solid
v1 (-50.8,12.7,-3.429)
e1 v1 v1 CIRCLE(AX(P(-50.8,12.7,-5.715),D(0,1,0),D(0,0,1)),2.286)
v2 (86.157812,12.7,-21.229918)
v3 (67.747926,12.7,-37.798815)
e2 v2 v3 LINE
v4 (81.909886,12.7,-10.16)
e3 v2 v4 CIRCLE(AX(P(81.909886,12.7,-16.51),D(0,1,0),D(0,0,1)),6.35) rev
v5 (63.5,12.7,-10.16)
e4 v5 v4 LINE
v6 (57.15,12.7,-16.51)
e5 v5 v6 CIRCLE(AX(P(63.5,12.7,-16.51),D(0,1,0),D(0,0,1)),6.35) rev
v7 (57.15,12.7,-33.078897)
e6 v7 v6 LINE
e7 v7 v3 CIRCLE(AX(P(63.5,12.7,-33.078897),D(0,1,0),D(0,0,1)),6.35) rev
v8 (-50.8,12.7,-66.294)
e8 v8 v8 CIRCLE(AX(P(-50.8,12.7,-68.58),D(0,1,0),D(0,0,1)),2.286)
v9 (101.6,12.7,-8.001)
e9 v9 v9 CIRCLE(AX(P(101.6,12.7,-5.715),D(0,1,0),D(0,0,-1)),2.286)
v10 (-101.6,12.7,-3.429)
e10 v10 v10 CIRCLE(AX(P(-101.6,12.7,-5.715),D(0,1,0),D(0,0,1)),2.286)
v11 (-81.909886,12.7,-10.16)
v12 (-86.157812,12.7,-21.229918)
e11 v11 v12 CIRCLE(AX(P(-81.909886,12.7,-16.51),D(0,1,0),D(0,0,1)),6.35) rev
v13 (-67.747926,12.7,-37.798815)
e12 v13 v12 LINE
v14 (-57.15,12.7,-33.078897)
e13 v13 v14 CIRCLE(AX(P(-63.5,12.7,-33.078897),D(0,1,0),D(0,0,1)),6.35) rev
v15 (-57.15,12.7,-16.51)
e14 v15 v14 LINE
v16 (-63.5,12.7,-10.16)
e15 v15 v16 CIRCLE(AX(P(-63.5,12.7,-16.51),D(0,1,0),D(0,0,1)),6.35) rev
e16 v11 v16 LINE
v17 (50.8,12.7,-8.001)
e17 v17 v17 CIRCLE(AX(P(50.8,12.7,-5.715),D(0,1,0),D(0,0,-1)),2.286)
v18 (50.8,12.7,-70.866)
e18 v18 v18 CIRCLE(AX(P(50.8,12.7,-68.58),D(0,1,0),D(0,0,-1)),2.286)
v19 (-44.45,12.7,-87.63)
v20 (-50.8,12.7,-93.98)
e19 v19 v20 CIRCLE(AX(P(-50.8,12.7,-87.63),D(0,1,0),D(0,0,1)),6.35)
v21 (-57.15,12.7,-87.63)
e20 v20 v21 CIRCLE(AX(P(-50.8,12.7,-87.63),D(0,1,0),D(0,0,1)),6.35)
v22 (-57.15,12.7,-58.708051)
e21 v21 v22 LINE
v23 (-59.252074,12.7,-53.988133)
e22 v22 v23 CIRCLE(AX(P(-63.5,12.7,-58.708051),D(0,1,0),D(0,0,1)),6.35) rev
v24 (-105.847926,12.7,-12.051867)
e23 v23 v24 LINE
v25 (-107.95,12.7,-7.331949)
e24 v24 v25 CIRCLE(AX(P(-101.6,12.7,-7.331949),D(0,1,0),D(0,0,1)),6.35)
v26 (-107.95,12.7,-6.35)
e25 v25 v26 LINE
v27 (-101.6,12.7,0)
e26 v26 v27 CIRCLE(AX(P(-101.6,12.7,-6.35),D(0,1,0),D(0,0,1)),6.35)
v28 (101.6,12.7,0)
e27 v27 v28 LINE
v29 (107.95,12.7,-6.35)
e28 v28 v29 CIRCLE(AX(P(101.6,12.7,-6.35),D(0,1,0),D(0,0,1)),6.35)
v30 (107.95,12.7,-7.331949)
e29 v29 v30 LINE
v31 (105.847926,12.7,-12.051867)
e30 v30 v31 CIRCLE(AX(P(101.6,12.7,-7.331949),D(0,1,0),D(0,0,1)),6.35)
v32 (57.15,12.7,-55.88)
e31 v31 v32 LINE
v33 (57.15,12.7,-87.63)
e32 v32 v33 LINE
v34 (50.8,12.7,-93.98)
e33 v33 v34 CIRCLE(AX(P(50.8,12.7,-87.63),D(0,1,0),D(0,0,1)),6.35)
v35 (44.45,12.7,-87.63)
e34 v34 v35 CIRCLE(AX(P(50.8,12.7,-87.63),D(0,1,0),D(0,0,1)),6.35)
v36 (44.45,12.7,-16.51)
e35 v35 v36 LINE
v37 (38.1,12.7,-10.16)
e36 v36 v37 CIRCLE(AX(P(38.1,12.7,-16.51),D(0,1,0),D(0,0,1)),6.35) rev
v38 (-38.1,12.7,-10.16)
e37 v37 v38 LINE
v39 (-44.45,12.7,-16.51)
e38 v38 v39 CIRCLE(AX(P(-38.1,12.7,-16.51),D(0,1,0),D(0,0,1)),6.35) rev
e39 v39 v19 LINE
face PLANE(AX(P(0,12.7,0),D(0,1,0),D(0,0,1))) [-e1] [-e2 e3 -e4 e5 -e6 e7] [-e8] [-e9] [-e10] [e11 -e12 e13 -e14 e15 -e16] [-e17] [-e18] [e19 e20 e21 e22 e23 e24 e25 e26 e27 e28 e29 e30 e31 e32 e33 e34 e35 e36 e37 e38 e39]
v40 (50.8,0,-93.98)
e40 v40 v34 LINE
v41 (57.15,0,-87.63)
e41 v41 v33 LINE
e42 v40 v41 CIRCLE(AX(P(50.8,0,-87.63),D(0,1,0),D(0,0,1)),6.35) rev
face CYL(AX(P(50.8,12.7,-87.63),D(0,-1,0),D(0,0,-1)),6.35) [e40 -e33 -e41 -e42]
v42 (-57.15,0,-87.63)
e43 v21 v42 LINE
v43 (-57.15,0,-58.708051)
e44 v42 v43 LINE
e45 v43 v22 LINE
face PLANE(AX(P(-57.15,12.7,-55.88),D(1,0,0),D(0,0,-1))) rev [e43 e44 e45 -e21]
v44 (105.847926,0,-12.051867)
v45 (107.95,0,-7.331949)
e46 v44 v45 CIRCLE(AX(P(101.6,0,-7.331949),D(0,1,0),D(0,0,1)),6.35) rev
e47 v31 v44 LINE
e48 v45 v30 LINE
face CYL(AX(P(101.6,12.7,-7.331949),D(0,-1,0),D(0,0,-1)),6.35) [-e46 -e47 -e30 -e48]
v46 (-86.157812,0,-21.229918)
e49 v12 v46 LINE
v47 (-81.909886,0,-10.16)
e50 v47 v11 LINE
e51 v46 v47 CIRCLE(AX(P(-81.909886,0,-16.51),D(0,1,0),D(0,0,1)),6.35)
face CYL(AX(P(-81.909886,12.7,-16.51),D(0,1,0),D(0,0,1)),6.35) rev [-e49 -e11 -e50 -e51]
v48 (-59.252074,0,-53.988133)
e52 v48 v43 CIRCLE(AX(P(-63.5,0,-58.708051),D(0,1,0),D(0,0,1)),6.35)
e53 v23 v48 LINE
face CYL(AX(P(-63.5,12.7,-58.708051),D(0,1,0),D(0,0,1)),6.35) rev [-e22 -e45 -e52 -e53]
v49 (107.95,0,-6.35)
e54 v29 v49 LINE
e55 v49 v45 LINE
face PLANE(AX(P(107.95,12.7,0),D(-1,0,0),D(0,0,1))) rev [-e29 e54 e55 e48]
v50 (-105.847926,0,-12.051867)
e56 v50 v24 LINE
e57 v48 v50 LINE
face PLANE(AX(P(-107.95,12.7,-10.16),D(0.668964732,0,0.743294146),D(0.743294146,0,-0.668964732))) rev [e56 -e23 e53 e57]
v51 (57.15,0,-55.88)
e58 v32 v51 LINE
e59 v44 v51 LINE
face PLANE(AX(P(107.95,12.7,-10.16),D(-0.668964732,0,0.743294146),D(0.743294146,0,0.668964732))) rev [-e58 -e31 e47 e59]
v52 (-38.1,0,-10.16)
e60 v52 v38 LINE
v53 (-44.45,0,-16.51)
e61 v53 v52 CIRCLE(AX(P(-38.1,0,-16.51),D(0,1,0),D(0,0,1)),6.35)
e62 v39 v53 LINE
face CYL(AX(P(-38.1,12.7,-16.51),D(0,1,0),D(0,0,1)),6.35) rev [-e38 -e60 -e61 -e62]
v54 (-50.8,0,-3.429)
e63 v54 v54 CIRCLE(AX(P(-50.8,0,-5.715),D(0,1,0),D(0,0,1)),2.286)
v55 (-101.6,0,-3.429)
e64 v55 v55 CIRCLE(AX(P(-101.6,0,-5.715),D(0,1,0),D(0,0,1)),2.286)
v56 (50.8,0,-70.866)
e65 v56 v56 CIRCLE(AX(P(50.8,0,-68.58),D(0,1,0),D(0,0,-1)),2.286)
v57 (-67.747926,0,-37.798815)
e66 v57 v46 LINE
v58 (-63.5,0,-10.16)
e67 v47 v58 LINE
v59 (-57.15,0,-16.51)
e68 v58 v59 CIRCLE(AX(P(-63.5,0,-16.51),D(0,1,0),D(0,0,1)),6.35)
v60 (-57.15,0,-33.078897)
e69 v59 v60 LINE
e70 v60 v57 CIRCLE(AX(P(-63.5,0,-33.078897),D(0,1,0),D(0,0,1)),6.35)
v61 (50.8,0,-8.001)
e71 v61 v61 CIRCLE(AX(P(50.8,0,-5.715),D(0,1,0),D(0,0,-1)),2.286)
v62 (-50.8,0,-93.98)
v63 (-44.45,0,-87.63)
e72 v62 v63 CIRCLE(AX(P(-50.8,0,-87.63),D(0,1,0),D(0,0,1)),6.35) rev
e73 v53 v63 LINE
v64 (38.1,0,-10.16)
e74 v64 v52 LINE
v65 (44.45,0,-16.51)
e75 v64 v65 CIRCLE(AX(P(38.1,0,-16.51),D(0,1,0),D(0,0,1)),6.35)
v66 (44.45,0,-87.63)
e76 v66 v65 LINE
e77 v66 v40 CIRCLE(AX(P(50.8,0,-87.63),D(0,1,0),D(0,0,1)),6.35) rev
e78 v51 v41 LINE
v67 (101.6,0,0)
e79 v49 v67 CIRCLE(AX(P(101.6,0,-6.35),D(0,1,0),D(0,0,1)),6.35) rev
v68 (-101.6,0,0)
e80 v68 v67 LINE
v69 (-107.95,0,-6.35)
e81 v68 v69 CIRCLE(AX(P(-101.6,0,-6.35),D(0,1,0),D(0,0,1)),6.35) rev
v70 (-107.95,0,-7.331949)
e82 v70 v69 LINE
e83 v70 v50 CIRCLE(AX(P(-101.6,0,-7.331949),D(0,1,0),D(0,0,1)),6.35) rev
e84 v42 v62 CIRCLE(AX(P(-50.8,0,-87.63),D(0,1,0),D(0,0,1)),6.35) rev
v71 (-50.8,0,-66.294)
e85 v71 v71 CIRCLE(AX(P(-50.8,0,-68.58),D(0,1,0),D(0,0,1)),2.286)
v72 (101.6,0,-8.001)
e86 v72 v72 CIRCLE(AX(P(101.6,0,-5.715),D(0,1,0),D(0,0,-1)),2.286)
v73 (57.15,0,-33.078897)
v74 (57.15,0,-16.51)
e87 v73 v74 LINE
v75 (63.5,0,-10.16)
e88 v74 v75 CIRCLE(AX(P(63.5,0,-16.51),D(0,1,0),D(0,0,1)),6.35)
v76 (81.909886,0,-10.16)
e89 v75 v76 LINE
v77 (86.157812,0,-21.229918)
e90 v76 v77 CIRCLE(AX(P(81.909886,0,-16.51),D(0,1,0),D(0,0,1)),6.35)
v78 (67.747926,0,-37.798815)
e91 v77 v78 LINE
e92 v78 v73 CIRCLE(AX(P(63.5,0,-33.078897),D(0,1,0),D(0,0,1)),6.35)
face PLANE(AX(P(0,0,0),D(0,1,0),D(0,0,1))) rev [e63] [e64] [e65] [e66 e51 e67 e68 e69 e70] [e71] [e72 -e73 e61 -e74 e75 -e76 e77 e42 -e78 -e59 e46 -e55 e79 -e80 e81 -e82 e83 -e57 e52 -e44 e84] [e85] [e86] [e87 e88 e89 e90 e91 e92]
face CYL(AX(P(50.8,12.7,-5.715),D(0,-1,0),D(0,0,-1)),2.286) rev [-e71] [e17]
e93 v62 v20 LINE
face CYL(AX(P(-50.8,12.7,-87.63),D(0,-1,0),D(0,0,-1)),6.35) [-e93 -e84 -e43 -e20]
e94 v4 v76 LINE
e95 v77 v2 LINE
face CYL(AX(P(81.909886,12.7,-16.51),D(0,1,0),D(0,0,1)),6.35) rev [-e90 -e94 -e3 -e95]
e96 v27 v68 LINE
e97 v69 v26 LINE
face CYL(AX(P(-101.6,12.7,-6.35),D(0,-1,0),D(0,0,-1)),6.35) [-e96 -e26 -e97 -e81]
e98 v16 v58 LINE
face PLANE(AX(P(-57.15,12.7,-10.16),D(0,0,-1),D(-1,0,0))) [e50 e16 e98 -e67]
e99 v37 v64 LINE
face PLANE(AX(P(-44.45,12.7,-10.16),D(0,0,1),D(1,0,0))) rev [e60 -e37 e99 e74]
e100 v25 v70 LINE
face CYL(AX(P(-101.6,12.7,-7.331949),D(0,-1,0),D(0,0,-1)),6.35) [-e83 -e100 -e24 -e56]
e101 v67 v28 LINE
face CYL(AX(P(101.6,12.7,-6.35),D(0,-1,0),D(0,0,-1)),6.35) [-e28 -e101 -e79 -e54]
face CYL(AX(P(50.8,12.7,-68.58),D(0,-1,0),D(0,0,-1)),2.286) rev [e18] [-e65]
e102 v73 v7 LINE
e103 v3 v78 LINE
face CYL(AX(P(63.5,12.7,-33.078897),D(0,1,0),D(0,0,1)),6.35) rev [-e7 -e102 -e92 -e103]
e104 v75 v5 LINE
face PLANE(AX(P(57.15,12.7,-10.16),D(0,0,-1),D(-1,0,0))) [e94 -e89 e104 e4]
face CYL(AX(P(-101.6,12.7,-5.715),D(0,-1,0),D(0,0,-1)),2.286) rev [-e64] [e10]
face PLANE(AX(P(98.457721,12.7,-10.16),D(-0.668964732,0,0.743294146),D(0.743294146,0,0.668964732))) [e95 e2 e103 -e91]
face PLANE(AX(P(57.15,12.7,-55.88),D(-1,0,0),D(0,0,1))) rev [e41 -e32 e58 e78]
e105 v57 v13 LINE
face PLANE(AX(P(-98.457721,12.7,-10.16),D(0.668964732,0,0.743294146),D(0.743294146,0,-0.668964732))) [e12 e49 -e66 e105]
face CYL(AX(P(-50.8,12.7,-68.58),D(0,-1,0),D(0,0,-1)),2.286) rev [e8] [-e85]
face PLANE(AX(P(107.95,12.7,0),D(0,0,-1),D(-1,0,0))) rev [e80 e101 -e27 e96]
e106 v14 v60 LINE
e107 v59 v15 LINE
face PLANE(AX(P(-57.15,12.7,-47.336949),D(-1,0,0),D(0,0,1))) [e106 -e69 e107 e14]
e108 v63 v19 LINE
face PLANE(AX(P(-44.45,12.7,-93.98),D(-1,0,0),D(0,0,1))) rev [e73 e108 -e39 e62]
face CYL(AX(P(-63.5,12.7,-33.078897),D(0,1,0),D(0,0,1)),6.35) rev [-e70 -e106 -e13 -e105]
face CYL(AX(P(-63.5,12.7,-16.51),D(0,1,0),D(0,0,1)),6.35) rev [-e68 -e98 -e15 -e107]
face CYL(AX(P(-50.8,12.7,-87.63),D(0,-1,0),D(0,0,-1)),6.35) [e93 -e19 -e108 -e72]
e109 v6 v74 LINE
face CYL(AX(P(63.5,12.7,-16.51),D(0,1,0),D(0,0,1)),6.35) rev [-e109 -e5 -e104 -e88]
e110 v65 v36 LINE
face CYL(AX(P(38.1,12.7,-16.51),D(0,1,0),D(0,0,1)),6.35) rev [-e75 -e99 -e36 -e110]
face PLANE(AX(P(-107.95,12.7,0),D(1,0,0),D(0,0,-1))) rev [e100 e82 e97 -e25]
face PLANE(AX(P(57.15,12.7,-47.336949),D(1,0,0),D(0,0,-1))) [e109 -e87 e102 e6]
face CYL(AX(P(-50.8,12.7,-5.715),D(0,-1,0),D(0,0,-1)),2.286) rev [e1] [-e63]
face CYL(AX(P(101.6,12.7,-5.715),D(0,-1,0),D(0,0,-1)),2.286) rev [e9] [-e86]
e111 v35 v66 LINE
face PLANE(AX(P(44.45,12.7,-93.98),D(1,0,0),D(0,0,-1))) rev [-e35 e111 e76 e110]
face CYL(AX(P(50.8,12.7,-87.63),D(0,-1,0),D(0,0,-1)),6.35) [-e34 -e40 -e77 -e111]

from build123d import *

# Parameters (mm, degrees)
SKETCH2_R           = 2.286
BOSS_EXTRUDE1_DEPTH = 12.7
FILLET1_R           = 6.35


with BuildPart() as part:
    # Sketch2 → Boss-Extrude1 (new body)
    with BuildSketch(Plane(origin=(0, 0, 0), x_dir=(1, 0, 0), z_dir=(0, 1, 0))):
        Polygon((107.95, 0), (-107.95, 0), (-107.95, 10.16), (-57.15, 55.88), (-57.15, 93.98), (-44.45, 93.98), (-44.45, 10.16), (44.45, 10.16), (44.45, 93.98), (57.15, 93.98), (57.15, 55.88), (107.95, 10.16), align=None)
        with Locations(Location((-50.8, 68.58, 0), (0, 0, 270))):
            Circle(SKETCH2_R, mode=Mode.SUBTRACT)
        with Locations(Location((50.8, 68.58, 0), (0, 0, 90))):
            Circle(SKETCH2_R, mode=Mode.SUBTRACT)
        with Locations(Location((-101.6, 5.715, 0), (0, 0, 270))):
            Circle(SKETCH2_R, mode=Mode.SUBTRACT)
        with Locations(Location((-50.8, 5.715, 0), (0, 0, 270))):
            Circle(SKETCH2_R, mode=Mode.SUBTRACT)
        with Locations(Location((101.6, 5.715, 0), (0, 0, 90))):
            Circle(SKETCH2_R, mode=Mode.SUBTRACT)
        with Locations(Location((50.8, 5.715, 0), (0, 0, 90))):
            Circle(SKETCH2_R, mode=Mode.SUBTRACT)
        Polygon((-57.15, 10.16), (-98.457720811, 10.16), (-57.15, 47.33694873), align=None, mode=Mode.SUBTRACT)
        Polygon((57.15, 47.33694873), (57.15, 10.16), (98.457720811, 10.16), align=None, mode=Mode.SUBTRACT)
    extrude(amount=BOSS_EXTRUDE1_DEPTH)

    # Fillet1
    fillet1_edges = [part.edges().sort_by_distance(p)[0] for p in [
        (57.15, 6.35, -93.98),
        (44.45, 6.35, -93.98),
        (-44.45, 6.35, -93.98),
        (-57.15, 6.35, -93.98),
        (-107.95, 6.35, -10.16),
        (-107.95, 6.35, 0),
        (107.95, 6.35, -10.16),
        (107.95, 6.35, 0),
        (98.457720811, 6.35, -10.16),
        (57.15, 6.35, -47.33694873),
        (57.15, 6.35, -10.16),
        (44.45, 6.35, -10.16),
        (-44.45, 6.35, -10.16),
        (-57.15, 6.35, -10.16),
        (-98.457720811, 6.35, -10.16),
        (-57.15, 6.35, -47.33694873),
        (-57.15, 6.35, -55.88),
    ]]
    fillet(fillet1_edges, radius=FILLET1_R - 0.0001)  # a hair under: the kernel refuses the full size


solid = part.part
